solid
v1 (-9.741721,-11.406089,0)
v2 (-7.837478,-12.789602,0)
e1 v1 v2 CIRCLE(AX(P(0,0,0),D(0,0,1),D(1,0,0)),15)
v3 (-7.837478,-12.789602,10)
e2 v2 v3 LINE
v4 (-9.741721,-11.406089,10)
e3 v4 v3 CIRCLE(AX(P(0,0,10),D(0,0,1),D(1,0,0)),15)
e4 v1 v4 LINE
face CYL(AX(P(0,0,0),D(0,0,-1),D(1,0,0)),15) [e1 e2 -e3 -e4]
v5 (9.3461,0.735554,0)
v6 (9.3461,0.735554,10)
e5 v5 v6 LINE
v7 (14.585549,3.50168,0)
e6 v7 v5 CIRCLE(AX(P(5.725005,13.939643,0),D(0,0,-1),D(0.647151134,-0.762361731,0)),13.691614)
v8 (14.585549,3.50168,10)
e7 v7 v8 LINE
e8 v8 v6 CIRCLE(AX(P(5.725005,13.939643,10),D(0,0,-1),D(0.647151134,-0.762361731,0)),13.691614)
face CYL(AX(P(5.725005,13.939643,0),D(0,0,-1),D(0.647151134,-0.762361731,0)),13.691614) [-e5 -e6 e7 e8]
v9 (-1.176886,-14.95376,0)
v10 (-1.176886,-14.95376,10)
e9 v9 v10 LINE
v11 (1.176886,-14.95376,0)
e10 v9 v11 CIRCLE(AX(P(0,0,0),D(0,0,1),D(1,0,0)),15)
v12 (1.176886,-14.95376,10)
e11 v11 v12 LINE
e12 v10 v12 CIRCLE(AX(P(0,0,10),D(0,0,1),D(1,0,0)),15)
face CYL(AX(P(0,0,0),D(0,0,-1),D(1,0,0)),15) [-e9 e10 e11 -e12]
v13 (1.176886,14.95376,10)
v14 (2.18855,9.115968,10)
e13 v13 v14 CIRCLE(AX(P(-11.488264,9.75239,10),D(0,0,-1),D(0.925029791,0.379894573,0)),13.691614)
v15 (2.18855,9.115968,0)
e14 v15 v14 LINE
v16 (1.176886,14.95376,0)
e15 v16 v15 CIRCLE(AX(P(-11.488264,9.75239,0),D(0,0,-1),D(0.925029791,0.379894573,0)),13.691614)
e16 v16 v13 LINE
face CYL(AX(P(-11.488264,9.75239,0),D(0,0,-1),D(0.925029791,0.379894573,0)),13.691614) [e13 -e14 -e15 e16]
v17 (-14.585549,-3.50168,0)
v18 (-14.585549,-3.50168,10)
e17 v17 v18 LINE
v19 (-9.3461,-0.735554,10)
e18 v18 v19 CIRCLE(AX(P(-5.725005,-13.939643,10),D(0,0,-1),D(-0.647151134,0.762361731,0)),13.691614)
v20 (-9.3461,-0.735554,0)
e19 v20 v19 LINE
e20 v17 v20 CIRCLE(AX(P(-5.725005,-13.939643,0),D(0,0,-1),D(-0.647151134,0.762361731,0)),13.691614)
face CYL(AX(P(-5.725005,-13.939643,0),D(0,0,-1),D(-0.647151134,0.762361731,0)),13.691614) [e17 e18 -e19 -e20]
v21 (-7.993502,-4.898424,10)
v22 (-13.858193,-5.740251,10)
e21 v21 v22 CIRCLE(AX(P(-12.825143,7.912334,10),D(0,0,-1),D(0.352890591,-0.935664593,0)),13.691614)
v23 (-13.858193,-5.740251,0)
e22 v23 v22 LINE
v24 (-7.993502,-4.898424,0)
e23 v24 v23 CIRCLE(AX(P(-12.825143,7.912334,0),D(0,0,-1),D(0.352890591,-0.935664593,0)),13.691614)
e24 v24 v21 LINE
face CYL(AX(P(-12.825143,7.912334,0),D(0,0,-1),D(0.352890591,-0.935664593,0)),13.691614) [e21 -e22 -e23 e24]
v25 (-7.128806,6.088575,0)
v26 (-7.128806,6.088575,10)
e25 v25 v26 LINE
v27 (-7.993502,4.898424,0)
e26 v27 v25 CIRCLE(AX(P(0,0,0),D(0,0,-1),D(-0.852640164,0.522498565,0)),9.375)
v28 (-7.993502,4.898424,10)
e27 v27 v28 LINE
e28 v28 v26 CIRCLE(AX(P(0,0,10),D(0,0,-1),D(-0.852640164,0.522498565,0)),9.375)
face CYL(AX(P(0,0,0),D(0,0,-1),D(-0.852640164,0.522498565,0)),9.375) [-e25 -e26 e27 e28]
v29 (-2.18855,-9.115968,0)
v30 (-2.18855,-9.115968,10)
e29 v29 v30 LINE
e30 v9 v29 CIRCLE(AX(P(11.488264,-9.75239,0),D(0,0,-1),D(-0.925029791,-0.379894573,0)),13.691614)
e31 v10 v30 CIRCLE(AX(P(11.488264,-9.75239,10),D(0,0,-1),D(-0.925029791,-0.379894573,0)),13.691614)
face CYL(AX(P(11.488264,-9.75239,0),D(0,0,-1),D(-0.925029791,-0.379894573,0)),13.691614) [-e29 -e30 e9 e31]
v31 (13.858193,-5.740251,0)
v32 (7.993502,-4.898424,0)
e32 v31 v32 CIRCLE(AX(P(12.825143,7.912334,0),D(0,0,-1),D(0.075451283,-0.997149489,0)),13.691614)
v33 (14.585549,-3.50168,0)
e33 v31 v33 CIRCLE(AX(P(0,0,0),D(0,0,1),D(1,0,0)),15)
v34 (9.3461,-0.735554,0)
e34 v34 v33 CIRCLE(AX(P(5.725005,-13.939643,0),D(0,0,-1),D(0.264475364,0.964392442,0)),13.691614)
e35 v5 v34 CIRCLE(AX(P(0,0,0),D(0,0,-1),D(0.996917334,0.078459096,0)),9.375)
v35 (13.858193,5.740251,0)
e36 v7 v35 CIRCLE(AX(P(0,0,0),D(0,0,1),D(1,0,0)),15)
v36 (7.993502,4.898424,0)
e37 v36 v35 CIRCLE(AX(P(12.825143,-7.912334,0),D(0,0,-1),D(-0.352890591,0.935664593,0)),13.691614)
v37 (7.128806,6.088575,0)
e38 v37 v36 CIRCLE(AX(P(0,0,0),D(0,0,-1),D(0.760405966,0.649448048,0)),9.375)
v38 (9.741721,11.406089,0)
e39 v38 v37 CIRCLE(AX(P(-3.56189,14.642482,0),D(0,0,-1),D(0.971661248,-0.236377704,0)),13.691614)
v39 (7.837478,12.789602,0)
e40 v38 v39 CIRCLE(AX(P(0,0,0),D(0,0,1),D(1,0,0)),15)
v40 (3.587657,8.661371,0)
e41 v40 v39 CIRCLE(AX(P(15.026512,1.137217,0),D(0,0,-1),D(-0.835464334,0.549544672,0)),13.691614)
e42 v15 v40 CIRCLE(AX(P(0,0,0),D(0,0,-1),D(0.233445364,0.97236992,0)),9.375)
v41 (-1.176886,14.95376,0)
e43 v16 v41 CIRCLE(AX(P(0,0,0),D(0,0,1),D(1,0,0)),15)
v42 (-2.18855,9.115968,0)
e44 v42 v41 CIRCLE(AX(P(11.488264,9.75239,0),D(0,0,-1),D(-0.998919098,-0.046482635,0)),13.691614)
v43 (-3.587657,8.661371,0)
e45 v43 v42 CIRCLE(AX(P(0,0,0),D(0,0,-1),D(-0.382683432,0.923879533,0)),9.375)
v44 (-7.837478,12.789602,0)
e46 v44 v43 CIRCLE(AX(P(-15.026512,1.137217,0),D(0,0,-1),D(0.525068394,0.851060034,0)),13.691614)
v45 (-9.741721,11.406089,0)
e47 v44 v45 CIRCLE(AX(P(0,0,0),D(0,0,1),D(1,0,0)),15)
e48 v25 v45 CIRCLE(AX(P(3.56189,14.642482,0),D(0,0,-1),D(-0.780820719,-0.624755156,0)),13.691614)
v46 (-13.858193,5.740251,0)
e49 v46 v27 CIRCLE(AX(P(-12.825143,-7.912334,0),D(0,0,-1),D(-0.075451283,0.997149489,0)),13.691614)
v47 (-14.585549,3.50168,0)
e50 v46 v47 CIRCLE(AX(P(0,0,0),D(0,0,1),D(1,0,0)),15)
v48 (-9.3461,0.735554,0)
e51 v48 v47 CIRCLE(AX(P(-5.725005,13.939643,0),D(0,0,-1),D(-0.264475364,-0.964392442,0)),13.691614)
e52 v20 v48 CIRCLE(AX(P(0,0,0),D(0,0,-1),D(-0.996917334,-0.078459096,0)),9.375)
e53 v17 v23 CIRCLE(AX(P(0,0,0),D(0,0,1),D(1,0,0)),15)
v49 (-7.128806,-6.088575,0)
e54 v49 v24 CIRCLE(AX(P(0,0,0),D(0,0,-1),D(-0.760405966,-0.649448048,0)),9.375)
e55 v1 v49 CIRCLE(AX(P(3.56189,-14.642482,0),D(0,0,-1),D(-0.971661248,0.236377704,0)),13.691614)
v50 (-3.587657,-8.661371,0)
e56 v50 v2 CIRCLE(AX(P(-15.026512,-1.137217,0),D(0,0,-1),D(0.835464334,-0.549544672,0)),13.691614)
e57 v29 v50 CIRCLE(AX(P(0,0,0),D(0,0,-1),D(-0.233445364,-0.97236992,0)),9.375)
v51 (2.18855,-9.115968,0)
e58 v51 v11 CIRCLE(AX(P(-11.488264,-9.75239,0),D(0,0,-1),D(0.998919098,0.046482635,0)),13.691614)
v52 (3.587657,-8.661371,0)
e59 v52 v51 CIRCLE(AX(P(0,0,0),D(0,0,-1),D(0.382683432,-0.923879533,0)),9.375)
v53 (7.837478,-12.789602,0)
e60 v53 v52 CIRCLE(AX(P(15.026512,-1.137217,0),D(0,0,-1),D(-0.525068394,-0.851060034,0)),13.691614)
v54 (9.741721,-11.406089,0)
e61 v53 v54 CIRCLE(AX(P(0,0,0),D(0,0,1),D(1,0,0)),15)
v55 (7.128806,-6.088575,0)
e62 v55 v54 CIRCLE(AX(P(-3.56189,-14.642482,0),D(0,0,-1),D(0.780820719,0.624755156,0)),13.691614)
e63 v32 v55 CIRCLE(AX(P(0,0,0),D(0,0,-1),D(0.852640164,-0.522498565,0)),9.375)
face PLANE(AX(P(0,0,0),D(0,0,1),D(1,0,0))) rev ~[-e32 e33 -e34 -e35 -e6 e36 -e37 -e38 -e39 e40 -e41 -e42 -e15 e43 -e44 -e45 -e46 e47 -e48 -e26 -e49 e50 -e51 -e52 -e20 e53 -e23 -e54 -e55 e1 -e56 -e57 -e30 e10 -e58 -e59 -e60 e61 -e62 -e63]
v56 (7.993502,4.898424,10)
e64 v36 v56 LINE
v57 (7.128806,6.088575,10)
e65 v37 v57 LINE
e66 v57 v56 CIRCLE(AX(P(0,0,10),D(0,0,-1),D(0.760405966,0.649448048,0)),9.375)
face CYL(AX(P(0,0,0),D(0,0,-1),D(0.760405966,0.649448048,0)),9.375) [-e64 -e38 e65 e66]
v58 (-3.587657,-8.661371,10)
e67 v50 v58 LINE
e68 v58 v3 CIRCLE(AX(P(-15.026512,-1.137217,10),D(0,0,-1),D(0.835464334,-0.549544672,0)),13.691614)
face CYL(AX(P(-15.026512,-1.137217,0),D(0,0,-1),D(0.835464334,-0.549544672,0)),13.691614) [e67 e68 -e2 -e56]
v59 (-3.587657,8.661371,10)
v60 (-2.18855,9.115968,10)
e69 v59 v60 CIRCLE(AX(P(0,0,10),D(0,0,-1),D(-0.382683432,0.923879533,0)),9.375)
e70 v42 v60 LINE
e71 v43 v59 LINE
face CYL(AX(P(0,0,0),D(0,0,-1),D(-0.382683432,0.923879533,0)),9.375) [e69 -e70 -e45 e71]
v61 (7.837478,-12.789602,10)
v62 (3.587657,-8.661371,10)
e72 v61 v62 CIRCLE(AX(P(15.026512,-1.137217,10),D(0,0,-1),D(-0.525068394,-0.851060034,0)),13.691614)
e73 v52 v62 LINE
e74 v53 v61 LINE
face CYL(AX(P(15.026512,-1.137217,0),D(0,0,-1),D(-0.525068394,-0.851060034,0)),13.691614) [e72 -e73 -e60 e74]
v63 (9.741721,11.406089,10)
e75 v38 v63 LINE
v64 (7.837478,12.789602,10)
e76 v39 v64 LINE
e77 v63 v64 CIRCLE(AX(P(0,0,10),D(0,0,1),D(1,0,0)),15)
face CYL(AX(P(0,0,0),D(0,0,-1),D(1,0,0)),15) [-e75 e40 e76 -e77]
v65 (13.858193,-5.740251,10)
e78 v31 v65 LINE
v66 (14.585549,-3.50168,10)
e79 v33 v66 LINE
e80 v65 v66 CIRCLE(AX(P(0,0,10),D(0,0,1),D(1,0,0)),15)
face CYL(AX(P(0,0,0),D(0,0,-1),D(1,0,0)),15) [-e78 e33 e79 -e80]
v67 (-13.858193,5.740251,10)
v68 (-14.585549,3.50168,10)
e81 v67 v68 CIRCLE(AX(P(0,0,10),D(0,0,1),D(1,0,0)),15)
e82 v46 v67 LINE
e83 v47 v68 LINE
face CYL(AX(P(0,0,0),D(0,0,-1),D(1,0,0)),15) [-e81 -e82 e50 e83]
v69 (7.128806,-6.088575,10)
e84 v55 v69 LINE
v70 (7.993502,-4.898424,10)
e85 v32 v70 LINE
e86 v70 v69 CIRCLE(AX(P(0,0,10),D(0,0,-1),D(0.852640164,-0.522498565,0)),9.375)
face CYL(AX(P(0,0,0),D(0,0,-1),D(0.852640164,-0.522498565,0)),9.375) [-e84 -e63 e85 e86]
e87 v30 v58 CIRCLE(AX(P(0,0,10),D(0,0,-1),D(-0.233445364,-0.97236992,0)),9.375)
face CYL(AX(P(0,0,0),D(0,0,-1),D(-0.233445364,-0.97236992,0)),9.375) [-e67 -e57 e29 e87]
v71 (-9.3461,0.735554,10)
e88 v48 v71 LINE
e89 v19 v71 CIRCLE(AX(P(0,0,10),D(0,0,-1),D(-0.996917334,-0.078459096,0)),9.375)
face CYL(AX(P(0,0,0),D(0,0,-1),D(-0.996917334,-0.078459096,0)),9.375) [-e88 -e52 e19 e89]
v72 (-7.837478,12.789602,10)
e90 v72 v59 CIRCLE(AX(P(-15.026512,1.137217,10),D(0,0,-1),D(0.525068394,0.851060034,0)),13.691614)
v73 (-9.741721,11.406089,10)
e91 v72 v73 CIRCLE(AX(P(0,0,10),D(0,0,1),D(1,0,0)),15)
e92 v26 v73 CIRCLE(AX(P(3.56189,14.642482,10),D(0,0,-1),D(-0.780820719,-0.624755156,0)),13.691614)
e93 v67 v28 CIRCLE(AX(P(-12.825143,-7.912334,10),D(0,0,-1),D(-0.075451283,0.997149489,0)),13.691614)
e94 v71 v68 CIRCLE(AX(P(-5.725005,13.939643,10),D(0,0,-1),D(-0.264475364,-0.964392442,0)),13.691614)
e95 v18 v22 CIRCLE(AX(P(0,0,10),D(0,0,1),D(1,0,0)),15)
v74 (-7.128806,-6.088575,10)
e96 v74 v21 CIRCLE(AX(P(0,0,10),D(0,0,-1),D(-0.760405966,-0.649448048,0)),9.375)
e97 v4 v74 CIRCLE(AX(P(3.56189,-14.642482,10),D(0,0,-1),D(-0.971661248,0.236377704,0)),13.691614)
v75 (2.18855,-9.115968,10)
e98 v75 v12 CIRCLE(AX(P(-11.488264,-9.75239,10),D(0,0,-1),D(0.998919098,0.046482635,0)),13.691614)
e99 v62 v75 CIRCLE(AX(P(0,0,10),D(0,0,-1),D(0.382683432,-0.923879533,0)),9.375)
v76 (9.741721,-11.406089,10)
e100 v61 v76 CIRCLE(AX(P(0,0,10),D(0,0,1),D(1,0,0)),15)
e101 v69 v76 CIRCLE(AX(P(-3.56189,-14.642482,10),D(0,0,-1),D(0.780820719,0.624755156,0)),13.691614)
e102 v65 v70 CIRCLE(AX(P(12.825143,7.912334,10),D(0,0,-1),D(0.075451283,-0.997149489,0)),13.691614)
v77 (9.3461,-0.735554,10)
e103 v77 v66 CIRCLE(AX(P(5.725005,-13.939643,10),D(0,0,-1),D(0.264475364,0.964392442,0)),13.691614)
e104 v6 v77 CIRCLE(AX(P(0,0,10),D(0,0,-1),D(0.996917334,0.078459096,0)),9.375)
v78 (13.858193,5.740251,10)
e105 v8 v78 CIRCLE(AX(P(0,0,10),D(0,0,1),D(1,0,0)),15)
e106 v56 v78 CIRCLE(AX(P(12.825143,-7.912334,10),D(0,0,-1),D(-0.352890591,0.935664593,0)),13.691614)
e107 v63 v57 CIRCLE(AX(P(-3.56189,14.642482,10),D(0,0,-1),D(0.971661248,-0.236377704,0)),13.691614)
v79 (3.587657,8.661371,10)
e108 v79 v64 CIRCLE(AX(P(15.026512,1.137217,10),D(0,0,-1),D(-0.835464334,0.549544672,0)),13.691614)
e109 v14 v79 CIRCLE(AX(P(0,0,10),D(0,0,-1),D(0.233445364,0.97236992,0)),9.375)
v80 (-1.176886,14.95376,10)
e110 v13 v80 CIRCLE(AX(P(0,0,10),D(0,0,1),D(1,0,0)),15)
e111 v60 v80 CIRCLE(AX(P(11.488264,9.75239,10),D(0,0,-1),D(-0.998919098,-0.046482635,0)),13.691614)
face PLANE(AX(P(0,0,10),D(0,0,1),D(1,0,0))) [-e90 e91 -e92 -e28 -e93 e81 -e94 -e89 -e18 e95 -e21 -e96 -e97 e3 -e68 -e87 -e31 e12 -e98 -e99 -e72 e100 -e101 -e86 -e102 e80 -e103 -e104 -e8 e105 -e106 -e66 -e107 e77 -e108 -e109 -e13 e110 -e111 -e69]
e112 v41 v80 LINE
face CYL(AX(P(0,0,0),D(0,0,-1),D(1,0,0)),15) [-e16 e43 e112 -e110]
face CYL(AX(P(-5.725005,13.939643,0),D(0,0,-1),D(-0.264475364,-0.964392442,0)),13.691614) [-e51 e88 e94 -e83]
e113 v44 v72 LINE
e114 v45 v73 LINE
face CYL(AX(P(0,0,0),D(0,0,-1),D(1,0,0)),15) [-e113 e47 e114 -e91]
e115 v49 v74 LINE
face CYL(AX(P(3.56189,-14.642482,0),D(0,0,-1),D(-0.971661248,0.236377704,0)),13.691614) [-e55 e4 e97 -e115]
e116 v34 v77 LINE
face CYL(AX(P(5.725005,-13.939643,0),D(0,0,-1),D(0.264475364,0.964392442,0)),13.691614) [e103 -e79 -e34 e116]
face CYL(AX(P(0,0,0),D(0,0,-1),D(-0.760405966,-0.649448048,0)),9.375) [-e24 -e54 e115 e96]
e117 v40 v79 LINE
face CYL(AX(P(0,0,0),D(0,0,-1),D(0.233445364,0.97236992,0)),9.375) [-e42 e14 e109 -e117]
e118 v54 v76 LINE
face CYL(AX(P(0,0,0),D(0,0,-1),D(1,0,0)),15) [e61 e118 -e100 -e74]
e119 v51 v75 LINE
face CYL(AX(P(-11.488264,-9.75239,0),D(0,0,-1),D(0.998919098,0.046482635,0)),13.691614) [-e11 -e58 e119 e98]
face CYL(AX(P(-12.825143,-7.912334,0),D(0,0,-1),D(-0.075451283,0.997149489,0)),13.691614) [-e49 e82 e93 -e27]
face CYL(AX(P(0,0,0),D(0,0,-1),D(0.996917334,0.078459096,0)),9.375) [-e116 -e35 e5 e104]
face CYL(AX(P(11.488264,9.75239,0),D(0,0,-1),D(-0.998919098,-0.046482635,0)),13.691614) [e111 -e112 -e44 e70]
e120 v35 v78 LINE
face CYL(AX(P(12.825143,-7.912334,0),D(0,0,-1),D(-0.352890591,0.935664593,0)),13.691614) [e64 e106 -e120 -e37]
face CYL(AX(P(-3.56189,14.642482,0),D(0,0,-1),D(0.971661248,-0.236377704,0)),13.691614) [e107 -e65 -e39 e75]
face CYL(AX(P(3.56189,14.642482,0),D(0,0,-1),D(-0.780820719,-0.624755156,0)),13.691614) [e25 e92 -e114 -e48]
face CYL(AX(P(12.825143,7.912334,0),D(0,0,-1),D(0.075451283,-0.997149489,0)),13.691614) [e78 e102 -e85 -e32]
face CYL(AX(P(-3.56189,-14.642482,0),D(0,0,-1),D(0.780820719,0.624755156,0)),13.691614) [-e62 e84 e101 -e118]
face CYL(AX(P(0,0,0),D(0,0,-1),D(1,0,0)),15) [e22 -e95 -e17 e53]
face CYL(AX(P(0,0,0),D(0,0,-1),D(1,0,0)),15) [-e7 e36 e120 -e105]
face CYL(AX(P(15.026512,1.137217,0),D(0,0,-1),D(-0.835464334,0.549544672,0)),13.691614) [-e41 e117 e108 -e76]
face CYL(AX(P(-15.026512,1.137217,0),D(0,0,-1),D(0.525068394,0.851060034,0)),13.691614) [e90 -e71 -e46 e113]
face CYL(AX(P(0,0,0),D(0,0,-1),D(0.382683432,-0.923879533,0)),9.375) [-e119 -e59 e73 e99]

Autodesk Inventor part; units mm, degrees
sketch "Sketch1" plane through (0, 0, 0) normal (0, 0, 1) x (1, 0, 0)
  circle A0 centre (0, 0) radius 15
  dimension "d0" = 30
extrude "Extrusion1" add sketch "Sketch1" along normal blind 10
ref_plane "Work Plane2" through (0, 0, 5) normal (0, 0, 1) x (1, 0, 0)
sketch "Sketch2" plane through (0, 0, 0) normal (0, 0, -1) x (-1, 0, 0)
  circle A0 centre (0, 0) radius 15 projected
  circle A1 centre (0, 0) radius 12.5
  dimension "d3" = 25
surface extrude "Pitch Diameter" sketch "Sketch2" against normal through all shown no curves A1
ref_plane "Work Plane8" through (0, 0, 0) normal (0.9510565, 0.309017, 0) x (0, 0, 1)
ref_plane "Work Plane9" through (0, 0, 0) normal (1, 0, 0) x (0, 1, 0)
spur gear teeth "Spur Gear" teeth 10 pitch diameter 25 tip diameter 30 root diameter 18.75 face width 10 start plane through (0, 0, 0) normal (0, 0, -1) x (-1, 0, 0)
equation "\"d0\" = da_da"
equation "\"d1\" = da_b"
equation "\"d3\" = da_d"
equation "\"da_da\" = 30"
equation "\"da_b\" = 10"
equation "\"da_d\" = 25"
properties part number "Spur Gear1" material "Steel"
